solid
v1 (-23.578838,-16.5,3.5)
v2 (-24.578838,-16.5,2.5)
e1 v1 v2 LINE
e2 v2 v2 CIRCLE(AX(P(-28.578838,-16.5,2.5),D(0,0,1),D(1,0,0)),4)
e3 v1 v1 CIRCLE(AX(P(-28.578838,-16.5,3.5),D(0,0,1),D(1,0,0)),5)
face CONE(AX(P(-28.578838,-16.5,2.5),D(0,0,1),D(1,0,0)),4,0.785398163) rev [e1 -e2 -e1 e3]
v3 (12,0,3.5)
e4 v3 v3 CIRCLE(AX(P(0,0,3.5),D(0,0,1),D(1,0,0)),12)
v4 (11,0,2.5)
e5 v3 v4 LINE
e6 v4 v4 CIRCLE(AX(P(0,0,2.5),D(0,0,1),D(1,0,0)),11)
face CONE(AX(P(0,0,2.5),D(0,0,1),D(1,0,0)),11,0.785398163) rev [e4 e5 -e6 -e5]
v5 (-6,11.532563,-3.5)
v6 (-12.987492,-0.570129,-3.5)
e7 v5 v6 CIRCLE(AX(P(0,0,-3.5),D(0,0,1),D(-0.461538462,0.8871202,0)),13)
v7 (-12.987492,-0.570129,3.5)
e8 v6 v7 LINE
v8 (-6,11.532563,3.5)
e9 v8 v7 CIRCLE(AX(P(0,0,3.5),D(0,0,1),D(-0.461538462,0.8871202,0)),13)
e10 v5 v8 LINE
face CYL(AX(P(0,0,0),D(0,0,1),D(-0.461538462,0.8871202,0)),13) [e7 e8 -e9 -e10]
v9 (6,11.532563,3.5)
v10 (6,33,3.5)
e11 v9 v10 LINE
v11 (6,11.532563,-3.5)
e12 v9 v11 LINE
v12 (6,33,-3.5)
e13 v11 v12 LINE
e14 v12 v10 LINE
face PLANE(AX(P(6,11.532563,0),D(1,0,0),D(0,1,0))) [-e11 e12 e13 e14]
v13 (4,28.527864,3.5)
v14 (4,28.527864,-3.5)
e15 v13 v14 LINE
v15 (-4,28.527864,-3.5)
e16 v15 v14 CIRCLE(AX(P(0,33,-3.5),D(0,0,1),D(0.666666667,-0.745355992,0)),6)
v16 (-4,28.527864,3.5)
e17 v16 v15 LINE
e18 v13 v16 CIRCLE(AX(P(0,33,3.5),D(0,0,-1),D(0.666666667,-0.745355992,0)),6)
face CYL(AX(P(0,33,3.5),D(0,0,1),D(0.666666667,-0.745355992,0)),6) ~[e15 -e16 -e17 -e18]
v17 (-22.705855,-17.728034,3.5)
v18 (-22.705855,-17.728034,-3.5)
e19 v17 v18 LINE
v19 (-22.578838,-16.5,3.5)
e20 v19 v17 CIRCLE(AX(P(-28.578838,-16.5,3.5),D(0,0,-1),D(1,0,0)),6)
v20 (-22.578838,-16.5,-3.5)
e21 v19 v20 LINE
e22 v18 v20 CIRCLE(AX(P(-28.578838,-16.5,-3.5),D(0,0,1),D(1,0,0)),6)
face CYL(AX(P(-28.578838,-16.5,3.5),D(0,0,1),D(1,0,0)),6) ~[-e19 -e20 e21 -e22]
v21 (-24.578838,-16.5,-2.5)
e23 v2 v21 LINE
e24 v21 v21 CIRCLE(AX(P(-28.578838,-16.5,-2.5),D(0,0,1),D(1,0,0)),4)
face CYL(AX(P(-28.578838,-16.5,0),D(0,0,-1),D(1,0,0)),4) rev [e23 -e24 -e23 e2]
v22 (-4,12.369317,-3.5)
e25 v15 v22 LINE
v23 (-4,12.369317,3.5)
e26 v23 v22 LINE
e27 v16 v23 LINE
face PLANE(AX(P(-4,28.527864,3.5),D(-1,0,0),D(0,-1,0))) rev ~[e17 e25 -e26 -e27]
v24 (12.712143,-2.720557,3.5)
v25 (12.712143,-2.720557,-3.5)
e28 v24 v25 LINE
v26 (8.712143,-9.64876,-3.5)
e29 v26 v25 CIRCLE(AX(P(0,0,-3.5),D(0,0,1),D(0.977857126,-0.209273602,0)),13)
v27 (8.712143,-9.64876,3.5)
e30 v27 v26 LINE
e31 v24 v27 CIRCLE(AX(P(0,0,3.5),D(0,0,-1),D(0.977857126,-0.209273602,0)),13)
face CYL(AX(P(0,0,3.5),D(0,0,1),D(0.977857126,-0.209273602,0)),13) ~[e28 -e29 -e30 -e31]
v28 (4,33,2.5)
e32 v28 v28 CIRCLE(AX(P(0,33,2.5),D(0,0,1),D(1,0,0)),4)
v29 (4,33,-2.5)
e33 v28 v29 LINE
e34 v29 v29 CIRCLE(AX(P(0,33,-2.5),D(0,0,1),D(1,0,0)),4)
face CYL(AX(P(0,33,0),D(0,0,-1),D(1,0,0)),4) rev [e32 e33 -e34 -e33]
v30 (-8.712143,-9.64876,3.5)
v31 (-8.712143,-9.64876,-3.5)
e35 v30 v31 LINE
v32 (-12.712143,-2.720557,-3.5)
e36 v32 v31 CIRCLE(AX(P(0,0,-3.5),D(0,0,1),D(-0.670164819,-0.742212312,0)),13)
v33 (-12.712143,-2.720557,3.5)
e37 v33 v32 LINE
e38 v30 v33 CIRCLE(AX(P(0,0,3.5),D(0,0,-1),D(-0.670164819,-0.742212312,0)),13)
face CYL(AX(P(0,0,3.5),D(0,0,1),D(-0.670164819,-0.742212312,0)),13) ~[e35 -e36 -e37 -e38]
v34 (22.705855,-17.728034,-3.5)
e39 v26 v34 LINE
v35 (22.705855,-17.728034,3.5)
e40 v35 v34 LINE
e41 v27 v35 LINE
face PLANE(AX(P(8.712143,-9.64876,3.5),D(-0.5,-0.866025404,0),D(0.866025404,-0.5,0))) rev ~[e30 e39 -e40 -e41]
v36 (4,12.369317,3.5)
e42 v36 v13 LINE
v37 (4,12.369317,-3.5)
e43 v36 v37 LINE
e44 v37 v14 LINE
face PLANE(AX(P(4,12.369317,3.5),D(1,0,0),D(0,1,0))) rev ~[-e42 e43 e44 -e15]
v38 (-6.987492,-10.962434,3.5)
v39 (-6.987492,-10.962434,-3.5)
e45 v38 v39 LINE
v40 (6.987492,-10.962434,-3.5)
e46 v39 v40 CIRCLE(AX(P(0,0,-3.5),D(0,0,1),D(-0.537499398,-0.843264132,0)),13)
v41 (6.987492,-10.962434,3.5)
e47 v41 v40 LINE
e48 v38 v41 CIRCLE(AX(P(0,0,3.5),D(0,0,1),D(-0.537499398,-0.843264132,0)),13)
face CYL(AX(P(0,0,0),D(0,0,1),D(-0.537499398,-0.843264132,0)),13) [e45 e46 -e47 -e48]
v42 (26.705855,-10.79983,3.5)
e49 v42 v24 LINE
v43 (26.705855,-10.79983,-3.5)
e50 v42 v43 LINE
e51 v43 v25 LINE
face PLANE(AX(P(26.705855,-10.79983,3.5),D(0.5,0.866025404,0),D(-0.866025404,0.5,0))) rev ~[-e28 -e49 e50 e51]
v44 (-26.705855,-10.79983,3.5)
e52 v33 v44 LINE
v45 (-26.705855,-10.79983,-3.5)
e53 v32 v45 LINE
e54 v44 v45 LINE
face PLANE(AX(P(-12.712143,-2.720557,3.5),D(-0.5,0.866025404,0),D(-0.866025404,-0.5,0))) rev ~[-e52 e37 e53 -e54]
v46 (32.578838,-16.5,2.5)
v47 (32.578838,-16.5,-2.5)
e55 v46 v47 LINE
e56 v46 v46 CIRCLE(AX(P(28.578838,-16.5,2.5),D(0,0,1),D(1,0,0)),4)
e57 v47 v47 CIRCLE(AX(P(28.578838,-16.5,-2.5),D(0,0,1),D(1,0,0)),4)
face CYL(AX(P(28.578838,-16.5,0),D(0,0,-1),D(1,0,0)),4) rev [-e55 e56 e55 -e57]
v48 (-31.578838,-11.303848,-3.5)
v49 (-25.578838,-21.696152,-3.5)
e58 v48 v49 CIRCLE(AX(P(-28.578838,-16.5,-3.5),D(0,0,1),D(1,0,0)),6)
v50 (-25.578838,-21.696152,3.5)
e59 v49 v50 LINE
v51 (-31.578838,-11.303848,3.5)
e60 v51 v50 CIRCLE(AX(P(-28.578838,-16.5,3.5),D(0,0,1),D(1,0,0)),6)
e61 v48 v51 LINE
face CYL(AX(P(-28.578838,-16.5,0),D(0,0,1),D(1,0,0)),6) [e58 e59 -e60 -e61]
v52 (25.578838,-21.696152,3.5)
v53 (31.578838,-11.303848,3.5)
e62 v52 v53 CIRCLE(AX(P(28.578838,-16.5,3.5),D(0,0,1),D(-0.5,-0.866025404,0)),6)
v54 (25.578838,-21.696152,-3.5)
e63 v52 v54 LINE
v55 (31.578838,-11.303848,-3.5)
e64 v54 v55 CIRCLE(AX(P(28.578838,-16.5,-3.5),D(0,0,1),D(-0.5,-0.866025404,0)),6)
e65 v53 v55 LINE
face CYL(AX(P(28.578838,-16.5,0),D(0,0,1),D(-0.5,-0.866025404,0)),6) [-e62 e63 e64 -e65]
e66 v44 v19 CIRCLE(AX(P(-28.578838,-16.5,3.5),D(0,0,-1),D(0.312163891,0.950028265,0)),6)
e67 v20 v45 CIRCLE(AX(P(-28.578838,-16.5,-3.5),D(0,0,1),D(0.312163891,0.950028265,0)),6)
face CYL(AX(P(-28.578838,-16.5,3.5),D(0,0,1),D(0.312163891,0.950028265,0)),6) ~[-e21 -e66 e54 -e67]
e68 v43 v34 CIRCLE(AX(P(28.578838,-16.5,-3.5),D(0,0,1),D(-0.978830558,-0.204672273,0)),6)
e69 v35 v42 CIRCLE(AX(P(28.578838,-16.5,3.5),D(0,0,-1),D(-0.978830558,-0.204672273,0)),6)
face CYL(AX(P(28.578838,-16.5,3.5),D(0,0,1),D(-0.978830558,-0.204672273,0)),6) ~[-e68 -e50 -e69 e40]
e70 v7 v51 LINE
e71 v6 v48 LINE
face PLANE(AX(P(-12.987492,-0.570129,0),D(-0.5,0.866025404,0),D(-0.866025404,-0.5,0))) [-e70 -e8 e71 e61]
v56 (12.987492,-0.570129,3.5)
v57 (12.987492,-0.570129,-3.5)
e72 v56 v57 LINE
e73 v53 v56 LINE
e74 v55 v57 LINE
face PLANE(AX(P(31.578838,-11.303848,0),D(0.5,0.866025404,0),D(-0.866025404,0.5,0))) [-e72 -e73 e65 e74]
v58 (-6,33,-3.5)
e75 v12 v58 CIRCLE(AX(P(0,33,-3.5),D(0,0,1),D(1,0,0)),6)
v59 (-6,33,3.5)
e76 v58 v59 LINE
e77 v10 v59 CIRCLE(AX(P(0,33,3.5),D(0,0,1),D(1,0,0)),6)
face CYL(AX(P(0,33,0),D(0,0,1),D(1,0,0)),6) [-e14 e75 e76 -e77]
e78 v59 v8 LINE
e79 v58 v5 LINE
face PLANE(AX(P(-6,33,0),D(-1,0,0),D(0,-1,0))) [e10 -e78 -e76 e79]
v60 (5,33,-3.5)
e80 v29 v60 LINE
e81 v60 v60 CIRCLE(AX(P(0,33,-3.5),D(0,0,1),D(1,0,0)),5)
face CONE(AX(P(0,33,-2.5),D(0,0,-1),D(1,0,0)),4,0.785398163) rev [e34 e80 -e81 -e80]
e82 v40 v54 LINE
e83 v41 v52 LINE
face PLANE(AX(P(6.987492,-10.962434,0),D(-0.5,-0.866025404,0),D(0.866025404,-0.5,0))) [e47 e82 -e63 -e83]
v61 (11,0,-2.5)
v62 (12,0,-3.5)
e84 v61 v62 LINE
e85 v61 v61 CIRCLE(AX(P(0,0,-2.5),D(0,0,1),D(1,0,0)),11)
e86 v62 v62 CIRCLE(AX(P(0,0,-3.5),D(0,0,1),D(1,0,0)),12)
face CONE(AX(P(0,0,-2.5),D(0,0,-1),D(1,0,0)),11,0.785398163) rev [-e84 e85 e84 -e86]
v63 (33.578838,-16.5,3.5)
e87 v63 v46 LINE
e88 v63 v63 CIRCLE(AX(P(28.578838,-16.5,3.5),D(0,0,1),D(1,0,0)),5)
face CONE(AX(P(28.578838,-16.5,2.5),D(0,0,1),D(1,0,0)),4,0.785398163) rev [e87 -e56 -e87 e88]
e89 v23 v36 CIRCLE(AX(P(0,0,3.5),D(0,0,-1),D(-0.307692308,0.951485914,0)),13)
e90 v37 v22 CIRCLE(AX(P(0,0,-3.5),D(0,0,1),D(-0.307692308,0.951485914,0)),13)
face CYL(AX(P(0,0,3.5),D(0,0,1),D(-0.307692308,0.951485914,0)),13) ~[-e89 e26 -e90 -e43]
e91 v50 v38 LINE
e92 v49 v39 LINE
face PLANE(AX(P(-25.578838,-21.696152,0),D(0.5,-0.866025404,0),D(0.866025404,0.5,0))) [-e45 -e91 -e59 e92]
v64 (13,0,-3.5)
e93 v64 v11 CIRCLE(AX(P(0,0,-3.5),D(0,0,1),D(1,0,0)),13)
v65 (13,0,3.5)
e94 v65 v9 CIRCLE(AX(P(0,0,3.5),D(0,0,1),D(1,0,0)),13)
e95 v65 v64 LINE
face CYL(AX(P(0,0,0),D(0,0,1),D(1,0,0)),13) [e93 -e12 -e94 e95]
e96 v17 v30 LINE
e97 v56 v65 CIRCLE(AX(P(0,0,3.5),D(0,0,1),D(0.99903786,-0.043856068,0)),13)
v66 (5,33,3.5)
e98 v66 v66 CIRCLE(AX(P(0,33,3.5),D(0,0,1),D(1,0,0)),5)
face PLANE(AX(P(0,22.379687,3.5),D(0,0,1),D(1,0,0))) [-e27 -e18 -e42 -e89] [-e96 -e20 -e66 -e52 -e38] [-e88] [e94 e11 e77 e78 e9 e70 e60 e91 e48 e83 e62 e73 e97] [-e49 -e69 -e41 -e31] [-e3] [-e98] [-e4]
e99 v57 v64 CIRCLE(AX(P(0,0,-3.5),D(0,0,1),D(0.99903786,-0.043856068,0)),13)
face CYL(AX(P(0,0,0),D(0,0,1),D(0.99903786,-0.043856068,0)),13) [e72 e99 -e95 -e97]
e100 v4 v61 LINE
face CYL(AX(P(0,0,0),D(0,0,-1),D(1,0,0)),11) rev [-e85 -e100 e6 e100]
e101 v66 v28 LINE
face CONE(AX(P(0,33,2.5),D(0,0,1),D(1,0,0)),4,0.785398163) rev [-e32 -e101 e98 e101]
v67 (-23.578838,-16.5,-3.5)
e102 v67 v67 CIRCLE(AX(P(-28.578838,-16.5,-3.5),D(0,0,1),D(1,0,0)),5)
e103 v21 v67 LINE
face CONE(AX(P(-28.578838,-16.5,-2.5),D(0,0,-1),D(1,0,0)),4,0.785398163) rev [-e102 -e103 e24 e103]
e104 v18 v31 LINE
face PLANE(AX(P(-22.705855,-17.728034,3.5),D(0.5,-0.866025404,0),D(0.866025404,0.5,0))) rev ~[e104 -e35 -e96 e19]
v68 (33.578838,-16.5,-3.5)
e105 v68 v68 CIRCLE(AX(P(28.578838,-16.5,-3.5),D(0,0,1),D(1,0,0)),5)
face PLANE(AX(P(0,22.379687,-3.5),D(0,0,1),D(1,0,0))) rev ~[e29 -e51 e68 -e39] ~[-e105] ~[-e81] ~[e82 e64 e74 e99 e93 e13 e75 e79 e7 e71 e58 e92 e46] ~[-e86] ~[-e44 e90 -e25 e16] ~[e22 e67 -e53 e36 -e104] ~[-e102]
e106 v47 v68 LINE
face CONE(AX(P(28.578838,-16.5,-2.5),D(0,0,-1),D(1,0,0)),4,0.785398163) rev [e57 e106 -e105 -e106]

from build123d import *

# Parameters (mm, degrees)
F0_R     = 11
F0_R_2   = 4
F1_DEPTH = 3.5
F2_SIZE  = 1
F4_DEPTH = 7.001


# Not quite as in the source:
# - a feature names something its author has since deleted; it is built from what else it names


with BuildPart() as f1:
    # F0 (on Top) → F1 (new body, symmetric)
    with BuildSketch(Plane.XY):
        with BuildLine():
            ThreePointArc((-6, 11.5325625947), (0, 13), (6, 11.5325625947))
            Line((6, 11.5325625947), (6, 33))
            ThreePointArc((6, 33), (0, 27), (-6, 33))
            Line((-6, 33), (-6, 11.5325625947))
        make_face()
        with BuildLine():
            ThreePointArc((-6.9874921777, -10.96243372), (-11.2583302492, -6.5), (-12.9874921777, -0.5701288746))
            Line((-12.9874921777, -0.5701288746), (-31.5788383249, -11.3038475773))
            ThreePointArc((-31.5788383249, -11.3038475773), (-25.5788383249, -11.3038475773), (-22.5788383249, -16.5))
            ThreePointArc((-22.5788383249, -16.5), (-23.3826859022, -19.5), (-25.5788383249, -21.6961524227))
            Line((-25.5788383249, -21.6961524227), (-6.9874921777, -10.96243372))
        make_face()
        with BuildLine():
            Line((31.5788383249, -11.3038475773), (12.9874921777, -0.5701288746))
            ThreePointArc((12.9874921777, -0.5701288746), (11.2583302492, -6.5), (6.9874921777, -10.96243372))
            Line((6.9874921777, -10.96243372), (25.5788383249, -21.6961524227))
            ThreePointArc((25.5788383249, -21.6961524227), (23.3826859022, -13.5), (31.5788383249, -11.3038475773))
        make_face()
        with BuildLine():
            ThreePointArc((12.9874921777, -0.5701288746), (12.9968726683, -0.2851330301), (13, 0))
            ThreePointArc((13, 0), (11.1130553854, 6.7453687816), (6, 11.5325625947))
            ThreePointArc((6, 11.5325625947), (0, 13), (-6, 11.5325625947))
            ThreePointArc((-6, 11.5325625947), (-11.2583302492, 6.5), (-12.9874921777, -0.5701288746))
            ThreePointArc((-12.9874921777, -0.5701288746), (-11.2583302492, -6.5), (-6.9874921777, -10.96243372))
            ThreePointArc((-6.9874921777, -10.96243372), (0, -13), (6.9874921777, -10.96243372))
            ThreePointArc((6.9874921777, -10.96243372), (11.2583302492, -6.5), (12.9874921777, -0.5701288746))
        make_face()
        Circle(F0_R, mode=Mode.SUBTRACT)
        with BuildLine():
            ThreePointArc((-6, 33), (0, 27), (6, 33))
            ThreePointArc((6, 33), (0, 39), (-6, 33))
        make_face()
        with Locations((0, 33)):
            Circle(F0_R_2, mode=Mode.SUBTRACT)
        with BuildLine():
            ThreePointArc((-22.5788383249, -16.5), (-25.5788383249, -11.3038475773), (-31.5788383249, -11.3038475773))
            ThreePointArc((-31.5788383249, -11.3038475773), (-33.7749907476, -19.5), (-25.5788383249, -21.6961524227))
            ThreePointArc((-25.5788383249, -21.6961524227), (-23.3826859022, -19.5), (-22.5788383249, -16.5))
        make_face()
        with Locations((-28.5788383249, -16.5)):
            Circle(F0_R_2, mode=Mode.SUBTRACT)
        with BuildLine():
            ThreePointArc((34.5788383249, -16.5), (33.7749907476, -13.5), (31.5788383249, -11.3038475773))
            ThreePointArc((31.5788383249, -11.3038475773), (23.3826859022, -13.5), (25.5788383249, -21.6961524227))
            ThreePointArc((25.5788383249, -21.6961524227), (31.5788383249, -21.6961524227), (34.5788383249, -16.5))
        make_face()
        with Locations((28.5788383249, -16.5)):
            Circle(F0_R_2, mode=Mode.SUBTRACT)
    extrude(amount=F1_DEPTH, both=True)

    # F2
    f2_edges = [f1.edges().sort_by_distance(p)[0] for p in [
        (-4, 33, 3.5),
        (-11, 0, 3.5),
        (-32.578838, -16.5, 3.5),
        (24.578838, -16.5, 3.5),
        (-32.578838, -16.5, -3.5),
        (-11, 0, -3.5),
        (24.578838, -16.5, -3.5),
        (-4, 33, -3.5),
    ]]
    chamfer(f2_edges, length=F2_SIZE)

    # F3 (on face) → F4 (cut, through all)
    with BuildSketch(Plane.XY.offset(3.5)):
        with BuildLine():
            Line((4, 12.3693168769), (4, 28.527864045))
            ThreePointArc((4, 28.527864045), (0, 27), (-4, 28.527864045))
            Line((-4, 28.527864045), (-4, 12.3693168769))
            ThreePointArc((-4, 12.3693168769), (0, 13), (4, 12.3693168769))
        make_face()
        with BuildLine():
            ThreePointArc((-8.7121426428, -9.6487600536), (-11.2583302492, -6.5), (-12.7121426428, -2.7205568233))
            Line((-12.7121426428, -2.7205568233), (-26.7058549787, -10.7998304074))
            ThreePointArc((-26.7058549787, -10.7998304074), (-23.7189051938, -12.9813283811), (-22.5788383249, -16.5))
            ThreePointArc((-22.5788383249, -16.5), (-22.6106769632, -17.117292444), (-22.7058549787, -17.7280336376))
            Line((-22.7058549787, -17.7280336376), (-8.7121426428, -9.6487600536))
        make_face()
        with BuildLine():
            Line((26.7058549787, -10.7998304074), (12.7121426428, -2.7205568233))
            ThreePointArc((12.7121426428, -2.7205568233), (11.2583302492, -6.5), (8.7121426428, -9.6487600536))
            Line((8.7121426428, -9.6487600536), (22.7058549787, -17.7280336376))
            ThreePointArc((22.7058549787, -17.7280336376), (23.3826859022, -13.5), (26.7058549787, -10.7998304074))
        make_face()
    extrude(amount=-F4_DEPTH, mode=Mode.SUBTRACT)


solid = f1.part
